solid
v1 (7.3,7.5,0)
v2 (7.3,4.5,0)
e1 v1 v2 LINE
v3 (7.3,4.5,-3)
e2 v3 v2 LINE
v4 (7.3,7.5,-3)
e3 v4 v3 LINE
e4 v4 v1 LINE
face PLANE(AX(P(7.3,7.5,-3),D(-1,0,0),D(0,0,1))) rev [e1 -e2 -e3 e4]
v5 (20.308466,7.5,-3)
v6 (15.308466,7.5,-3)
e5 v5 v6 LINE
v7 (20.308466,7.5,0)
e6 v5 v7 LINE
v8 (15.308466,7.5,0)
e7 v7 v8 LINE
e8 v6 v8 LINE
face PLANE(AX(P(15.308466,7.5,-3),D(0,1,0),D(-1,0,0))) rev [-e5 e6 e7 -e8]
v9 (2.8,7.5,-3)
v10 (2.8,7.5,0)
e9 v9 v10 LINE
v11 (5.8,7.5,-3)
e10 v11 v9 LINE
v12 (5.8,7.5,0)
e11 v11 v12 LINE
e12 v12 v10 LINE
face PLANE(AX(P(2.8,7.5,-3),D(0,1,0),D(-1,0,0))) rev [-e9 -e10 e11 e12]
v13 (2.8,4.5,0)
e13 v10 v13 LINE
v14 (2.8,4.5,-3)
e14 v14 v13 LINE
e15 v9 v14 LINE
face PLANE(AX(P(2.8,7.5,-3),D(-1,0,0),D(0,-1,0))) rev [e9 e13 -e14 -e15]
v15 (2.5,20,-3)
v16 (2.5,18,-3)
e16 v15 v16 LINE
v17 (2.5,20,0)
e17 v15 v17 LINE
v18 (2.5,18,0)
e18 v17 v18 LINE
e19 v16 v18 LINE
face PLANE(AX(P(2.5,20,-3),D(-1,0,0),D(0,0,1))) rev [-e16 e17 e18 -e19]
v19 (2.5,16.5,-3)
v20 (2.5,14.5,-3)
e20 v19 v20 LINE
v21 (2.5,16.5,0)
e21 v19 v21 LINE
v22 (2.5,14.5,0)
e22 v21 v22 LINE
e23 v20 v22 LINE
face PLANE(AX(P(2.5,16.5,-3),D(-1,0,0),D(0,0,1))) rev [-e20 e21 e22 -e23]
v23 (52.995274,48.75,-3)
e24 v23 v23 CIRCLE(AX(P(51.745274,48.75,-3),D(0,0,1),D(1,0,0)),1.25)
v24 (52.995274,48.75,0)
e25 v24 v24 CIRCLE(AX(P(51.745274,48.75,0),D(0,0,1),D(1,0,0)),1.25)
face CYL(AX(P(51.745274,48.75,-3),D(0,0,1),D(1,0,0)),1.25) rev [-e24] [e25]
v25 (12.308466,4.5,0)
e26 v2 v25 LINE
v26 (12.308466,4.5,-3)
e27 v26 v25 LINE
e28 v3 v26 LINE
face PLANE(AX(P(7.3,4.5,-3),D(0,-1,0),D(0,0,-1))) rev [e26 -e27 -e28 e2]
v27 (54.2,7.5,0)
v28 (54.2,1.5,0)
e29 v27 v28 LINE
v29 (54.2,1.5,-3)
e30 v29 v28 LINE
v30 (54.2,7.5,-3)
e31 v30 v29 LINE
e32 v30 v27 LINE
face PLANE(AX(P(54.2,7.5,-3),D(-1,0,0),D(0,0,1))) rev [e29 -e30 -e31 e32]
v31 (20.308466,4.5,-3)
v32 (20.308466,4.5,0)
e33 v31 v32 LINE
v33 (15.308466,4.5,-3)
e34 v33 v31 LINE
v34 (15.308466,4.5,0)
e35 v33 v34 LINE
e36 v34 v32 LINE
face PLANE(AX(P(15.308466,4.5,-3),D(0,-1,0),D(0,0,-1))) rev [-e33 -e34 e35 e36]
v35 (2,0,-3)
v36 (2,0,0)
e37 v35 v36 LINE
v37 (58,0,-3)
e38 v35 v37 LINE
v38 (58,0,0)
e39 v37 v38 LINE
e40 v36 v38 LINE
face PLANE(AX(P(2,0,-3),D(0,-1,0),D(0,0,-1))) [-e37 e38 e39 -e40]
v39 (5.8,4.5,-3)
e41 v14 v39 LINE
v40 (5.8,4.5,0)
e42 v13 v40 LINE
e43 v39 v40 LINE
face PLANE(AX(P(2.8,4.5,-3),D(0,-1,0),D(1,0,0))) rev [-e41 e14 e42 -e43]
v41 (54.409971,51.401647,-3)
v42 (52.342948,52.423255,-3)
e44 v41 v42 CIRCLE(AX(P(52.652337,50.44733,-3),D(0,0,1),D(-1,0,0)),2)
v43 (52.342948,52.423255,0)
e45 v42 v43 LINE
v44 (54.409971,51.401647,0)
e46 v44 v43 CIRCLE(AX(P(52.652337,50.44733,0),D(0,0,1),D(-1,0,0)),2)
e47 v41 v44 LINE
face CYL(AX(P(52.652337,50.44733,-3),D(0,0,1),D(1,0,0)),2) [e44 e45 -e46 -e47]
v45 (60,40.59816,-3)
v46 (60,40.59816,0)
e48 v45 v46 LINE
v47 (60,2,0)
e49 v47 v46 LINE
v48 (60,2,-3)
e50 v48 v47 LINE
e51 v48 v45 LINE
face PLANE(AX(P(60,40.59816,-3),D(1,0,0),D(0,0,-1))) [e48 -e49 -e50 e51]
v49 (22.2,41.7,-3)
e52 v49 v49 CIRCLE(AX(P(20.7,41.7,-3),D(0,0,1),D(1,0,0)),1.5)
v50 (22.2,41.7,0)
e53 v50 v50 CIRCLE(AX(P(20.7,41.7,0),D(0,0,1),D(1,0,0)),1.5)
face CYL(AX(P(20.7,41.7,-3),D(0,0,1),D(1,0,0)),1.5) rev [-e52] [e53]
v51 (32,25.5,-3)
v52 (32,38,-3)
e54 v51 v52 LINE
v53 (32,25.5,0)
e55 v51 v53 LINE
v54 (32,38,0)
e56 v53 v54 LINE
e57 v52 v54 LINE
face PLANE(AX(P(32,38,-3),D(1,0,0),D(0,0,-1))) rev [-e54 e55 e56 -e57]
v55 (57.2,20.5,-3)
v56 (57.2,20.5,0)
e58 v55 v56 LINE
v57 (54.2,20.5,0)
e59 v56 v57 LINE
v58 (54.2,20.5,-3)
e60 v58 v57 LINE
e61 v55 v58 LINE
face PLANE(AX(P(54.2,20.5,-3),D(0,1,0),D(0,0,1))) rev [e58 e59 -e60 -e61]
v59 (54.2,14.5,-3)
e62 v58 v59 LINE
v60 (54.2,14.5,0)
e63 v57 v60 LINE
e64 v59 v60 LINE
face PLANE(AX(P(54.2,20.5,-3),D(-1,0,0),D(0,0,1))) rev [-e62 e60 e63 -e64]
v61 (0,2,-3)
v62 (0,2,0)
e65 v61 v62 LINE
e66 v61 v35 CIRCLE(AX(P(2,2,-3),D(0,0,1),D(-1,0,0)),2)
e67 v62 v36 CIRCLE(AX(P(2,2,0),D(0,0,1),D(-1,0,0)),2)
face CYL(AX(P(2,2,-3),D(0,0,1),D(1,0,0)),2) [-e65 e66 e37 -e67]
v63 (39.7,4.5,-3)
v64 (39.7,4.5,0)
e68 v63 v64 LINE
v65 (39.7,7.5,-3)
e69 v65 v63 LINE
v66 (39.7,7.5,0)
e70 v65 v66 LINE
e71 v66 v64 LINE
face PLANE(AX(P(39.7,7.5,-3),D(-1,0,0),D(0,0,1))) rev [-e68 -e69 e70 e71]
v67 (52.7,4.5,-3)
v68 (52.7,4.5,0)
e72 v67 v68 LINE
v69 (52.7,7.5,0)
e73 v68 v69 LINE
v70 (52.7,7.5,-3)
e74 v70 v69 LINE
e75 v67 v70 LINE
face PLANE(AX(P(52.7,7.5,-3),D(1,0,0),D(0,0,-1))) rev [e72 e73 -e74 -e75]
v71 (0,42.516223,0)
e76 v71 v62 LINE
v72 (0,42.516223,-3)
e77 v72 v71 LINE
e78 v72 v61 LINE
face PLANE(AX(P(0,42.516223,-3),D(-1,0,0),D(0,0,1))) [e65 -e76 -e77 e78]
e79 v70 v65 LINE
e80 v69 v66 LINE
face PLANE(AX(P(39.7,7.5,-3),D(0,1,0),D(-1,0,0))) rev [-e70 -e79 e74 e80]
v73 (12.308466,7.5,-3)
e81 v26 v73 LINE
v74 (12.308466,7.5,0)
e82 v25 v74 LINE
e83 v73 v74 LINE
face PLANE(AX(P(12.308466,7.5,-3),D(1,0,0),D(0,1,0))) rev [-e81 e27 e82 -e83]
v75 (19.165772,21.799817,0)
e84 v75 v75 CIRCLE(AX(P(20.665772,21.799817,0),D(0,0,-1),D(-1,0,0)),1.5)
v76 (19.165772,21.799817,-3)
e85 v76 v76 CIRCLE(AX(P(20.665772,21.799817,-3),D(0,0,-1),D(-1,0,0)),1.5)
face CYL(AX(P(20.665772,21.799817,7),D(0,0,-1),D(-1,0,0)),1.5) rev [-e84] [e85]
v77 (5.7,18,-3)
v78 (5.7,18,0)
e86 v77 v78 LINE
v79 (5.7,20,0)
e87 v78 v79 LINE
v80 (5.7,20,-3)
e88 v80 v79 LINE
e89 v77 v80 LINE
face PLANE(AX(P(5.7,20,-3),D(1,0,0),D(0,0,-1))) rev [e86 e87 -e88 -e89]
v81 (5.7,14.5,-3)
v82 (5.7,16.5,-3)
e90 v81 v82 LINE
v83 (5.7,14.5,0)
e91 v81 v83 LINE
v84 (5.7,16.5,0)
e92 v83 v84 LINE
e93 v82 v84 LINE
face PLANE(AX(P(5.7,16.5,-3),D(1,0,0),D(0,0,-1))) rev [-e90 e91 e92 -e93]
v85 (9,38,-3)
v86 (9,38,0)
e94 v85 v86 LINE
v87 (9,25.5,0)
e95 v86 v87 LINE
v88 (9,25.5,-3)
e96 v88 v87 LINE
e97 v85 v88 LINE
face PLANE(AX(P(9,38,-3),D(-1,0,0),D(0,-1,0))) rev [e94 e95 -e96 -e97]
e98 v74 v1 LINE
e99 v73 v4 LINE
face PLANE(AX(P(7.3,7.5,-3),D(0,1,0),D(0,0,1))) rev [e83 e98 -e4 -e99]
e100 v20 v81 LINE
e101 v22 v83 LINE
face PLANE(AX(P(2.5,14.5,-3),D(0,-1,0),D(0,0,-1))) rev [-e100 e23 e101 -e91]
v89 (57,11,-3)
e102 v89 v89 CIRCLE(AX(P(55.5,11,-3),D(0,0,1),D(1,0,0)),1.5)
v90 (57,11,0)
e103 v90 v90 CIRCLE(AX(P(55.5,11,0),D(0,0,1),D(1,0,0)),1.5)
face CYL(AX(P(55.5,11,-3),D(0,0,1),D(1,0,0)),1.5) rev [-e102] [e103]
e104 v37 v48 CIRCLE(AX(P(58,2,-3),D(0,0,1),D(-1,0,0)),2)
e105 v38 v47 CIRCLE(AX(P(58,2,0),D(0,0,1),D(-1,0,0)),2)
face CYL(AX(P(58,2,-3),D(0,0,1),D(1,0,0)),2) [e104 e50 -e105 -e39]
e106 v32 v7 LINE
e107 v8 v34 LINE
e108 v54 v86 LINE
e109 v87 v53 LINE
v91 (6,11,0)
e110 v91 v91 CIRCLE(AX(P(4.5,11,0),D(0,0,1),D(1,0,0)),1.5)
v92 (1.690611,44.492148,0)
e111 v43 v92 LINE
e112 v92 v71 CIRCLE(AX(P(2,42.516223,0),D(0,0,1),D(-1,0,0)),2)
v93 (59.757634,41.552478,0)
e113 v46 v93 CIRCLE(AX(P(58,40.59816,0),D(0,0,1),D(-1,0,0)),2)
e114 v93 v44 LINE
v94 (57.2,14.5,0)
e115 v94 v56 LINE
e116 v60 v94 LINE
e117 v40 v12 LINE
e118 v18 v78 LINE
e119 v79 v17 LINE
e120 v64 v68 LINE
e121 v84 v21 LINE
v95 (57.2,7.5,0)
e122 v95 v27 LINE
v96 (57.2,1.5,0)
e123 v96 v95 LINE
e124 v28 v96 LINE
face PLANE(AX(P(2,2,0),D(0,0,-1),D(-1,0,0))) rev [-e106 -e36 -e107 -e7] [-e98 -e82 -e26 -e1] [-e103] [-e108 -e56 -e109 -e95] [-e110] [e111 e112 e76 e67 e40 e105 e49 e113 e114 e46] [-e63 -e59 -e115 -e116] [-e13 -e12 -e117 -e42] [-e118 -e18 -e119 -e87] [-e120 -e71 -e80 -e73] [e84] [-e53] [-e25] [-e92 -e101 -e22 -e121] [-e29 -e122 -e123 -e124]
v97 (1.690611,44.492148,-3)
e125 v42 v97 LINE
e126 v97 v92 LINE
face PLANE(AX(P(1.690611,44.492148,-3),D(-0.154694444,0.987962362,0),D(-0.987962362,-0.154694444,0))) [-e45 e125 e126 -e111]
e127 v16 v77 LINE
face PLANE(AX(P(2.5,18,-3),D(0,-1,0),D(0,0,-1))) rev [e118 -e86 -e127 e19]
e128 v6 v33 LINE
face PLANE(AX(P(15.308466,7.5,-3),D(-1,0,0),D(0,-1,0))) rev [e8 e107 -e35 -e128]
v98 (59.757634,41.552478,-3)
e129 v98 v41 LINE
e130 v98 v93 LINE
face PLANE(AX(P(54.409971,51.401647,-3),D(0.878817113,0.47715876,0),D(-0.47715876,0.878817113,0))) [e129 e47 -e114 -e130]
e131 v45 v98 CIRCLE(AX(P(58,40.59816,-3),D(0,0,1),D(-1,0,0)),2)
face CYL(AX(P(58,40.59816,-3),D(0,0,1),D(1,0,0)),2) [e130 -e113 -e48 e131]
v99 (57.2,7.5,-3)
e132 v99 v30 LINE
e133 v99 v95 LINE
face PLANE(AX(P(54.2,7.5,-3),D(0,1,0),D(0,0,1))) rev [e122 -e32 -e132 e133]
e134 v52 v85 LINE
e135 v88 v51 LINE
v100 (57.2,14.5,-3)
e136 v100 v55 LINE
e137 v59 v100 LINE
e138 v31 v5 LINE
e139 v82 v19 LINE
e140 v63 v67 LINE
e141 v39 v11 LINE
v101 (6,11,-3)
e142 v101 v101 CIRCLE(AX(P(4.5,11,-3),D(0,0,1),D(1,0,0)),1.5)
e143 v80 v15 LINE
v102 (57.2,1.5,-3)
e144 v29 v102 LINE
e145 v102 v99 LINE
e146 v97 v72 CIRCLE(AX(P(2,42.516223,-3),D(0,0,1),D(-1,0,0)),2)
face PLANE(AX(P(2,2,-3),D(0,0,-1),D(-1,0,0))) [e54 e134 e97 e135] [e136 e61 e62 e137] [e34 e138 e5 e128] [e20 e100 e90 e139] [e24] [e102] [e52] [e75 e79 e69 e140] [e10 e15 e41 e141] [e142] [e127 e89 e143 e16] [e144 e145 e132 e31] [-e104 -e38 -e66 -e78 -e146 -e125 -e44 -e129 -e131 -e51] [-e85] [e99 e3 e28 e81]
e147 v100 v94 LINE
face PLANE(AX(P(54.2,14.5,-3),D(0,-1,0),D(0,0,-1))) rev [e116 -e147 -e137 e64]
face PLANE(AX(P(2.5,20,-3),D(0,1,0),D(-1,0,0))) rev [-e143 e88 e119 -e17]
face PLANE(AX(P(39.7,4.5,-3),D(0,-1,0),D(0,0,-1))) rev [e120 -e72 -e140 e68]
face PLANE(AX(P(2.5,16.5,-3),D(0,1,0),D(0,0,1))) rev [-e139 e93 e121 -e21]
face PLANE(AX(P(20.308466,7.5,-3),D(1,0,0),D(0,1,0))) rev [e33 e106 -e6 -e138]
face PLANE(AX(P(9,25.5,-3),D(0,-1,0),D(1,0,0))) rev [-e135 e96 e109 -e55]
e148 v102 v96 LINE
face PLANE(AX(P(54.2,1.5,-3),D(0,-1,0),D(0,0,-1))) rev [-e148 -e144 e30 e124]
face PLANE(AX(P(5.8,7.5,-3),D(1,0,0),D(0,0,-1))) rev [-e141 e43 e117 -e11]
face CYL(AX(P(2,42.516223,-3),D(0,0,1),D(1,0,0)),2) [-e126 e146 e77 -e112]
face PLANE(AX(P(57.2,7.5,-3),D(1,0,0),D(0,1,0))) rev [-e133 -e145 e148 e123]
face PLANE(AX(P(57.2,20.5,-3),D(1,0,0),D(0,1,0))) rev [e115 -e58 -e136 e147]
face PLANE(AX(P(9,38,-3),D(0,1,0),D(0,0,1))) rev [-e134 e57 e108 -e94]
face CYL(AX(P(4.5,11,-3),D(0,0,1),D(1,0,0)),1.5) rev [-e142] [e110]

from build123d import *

# Parameters (mm, degrees)
ESQUISSE1_R               = 1.25
ESQUISSE1_R_2             = 1.5
ESQUISSE1_W               = 23
ESQUISSE1_H               = 12.5
ESQUISSE1_W_2             = 13
ESQUISSE1_H_2             = 3
ESQUISSE1_W_3             = 3
ESQUISSE1_H_3             = 6
ESQUISSE1_W_4             = 5
ESQUISSE1_W_5             = 5.008466432
ESQUISSE1_W_6             = 3.2
ESQUISSE1_H_4             = 2
T_LE_DE_BASE_PLI_E1_DEPTH = 3
ESQUISSE2_R               = 1.5
ENL_V_MAT_EXTRU_1_DEPTH   = 10


# Sheet-metal steps are written as plain solids
with BuildPart() as part:
    # Esquisse1 → Tôle de base pliée1 (new body)
    with BuildSketch(Plane.XY):
        with BuildLine():
            Line((0, 42.516223037), (0, 2))
            ThreePointArc((0, 2), (0.585786438, 0.585786438), (2, 0))
            Line((2, 0), (58, 0))
            ThreePointArc((58, 0), (59.414213562, 0.585786438), (60, 2))
            Line((60, 2), (60, 40.598160001))
            ThreePointArc((60, 40.598160001), (59.938461819, 41.090466587), (59.757634225, 41.552477522))
            Line((59.757634225, 41.552477522), (54.409971269, 51.401647463))
            ThreePointArc((54.409971269, 51.401647463), (53.538493891, 52.240295654), (52.342948156, 52.423254667))
            Line((52.342948156, 52.423254667), (1.690611112, 44.492147761))
            ThreePointArc((1.690611112, 44.492147761), (0.480332639, 43.816458059), (0, 42.516223037))
        make_face()
        with Locations((51.745273693, 48.75)):
            Circle(ESQUISSE1_R, mode=Mode.SUBTRACT)
        with Locations((20.7, 41.7)):
            Circle(ESQUISSE1_R_2, mode=Mode.SUBTRACT)
        with Locations((4.5, 11)):
            Circle(ESQUISSE1_R_2, mode=Mode.SUBTRACT)
        with Locations((55.5, 11)):
            Circle(ESQUISSE1_R_2, mode=Mode.SUBTRACT)
        with Locations((20.5, 31.75)):
            Rectangle(ESQUISSE1_W, ESQUISSE1_H, mode=Mode.SUBTRACT)
        with Locations((46.2, 6)):
            Rectangle(ESQUISSE1_W_2, ESQUISSE1_H_2, mode=Mode.SUBTRACT)
        with Locations((55.7, 4.5)):
            Rectangle(ESQUISSE1_W_3, ESQUISSE1_H_3, mode=Mode.SUBTRACT)
        with Locations((55.7, 17.5)):
            Rectangle(ESQUISSE1_W_3, ESQUISSE1_H_3, mode=Mode.SUBTRACT)
        with Locations((17.808466432, 6)):
            Rectangle(ESQUISSE1_W_4, ESQUISSE1_H_2, mode=Mode.SUBTRACT)
        with Locations((9.804233216, 6)):
            Rectangle(ESQUISSE1_W_5, ESQUISSE1_H_2, mode=Mode.SUBTRACT)
        with Locations((4.3, 6)):
            Rectangle(ESQUISSE1_W_3, ESQUISSE1_H_2, mode=Mode.SUBTRACT)
        with Locations((4.1, 15.5)):
            Rectangle(ESQUISSE1_W_6, ESQUISSE1_H_4, mode=Mode.SUBTRACT)
        with Locations((4.1, 19)):
            Rectangle(ESQUISSE1_W_6, ESQUISSE1_H_4, mode=Mode.SUBTRACT)
    extrude(amount=-T_LE_DE_BASE_PLI_E1_DEPTH)

    # Esquisse2 → Enlèv. mat.-Extru.1 (cut)
    with BuildSketch(Plane(origin=(0, 0, -3), x_dir=(-1, 0, 0), z_dir=(0, 0, -1))):
        with Locations((-20.66577155, 21.799816522)):
            Circle(ESQUISSE2_R)
    extrude(amount=-ENL_V_MAT_EXTRU_1_DEPTH, mode=Mode.SUBTRACT)


solid = part.part
